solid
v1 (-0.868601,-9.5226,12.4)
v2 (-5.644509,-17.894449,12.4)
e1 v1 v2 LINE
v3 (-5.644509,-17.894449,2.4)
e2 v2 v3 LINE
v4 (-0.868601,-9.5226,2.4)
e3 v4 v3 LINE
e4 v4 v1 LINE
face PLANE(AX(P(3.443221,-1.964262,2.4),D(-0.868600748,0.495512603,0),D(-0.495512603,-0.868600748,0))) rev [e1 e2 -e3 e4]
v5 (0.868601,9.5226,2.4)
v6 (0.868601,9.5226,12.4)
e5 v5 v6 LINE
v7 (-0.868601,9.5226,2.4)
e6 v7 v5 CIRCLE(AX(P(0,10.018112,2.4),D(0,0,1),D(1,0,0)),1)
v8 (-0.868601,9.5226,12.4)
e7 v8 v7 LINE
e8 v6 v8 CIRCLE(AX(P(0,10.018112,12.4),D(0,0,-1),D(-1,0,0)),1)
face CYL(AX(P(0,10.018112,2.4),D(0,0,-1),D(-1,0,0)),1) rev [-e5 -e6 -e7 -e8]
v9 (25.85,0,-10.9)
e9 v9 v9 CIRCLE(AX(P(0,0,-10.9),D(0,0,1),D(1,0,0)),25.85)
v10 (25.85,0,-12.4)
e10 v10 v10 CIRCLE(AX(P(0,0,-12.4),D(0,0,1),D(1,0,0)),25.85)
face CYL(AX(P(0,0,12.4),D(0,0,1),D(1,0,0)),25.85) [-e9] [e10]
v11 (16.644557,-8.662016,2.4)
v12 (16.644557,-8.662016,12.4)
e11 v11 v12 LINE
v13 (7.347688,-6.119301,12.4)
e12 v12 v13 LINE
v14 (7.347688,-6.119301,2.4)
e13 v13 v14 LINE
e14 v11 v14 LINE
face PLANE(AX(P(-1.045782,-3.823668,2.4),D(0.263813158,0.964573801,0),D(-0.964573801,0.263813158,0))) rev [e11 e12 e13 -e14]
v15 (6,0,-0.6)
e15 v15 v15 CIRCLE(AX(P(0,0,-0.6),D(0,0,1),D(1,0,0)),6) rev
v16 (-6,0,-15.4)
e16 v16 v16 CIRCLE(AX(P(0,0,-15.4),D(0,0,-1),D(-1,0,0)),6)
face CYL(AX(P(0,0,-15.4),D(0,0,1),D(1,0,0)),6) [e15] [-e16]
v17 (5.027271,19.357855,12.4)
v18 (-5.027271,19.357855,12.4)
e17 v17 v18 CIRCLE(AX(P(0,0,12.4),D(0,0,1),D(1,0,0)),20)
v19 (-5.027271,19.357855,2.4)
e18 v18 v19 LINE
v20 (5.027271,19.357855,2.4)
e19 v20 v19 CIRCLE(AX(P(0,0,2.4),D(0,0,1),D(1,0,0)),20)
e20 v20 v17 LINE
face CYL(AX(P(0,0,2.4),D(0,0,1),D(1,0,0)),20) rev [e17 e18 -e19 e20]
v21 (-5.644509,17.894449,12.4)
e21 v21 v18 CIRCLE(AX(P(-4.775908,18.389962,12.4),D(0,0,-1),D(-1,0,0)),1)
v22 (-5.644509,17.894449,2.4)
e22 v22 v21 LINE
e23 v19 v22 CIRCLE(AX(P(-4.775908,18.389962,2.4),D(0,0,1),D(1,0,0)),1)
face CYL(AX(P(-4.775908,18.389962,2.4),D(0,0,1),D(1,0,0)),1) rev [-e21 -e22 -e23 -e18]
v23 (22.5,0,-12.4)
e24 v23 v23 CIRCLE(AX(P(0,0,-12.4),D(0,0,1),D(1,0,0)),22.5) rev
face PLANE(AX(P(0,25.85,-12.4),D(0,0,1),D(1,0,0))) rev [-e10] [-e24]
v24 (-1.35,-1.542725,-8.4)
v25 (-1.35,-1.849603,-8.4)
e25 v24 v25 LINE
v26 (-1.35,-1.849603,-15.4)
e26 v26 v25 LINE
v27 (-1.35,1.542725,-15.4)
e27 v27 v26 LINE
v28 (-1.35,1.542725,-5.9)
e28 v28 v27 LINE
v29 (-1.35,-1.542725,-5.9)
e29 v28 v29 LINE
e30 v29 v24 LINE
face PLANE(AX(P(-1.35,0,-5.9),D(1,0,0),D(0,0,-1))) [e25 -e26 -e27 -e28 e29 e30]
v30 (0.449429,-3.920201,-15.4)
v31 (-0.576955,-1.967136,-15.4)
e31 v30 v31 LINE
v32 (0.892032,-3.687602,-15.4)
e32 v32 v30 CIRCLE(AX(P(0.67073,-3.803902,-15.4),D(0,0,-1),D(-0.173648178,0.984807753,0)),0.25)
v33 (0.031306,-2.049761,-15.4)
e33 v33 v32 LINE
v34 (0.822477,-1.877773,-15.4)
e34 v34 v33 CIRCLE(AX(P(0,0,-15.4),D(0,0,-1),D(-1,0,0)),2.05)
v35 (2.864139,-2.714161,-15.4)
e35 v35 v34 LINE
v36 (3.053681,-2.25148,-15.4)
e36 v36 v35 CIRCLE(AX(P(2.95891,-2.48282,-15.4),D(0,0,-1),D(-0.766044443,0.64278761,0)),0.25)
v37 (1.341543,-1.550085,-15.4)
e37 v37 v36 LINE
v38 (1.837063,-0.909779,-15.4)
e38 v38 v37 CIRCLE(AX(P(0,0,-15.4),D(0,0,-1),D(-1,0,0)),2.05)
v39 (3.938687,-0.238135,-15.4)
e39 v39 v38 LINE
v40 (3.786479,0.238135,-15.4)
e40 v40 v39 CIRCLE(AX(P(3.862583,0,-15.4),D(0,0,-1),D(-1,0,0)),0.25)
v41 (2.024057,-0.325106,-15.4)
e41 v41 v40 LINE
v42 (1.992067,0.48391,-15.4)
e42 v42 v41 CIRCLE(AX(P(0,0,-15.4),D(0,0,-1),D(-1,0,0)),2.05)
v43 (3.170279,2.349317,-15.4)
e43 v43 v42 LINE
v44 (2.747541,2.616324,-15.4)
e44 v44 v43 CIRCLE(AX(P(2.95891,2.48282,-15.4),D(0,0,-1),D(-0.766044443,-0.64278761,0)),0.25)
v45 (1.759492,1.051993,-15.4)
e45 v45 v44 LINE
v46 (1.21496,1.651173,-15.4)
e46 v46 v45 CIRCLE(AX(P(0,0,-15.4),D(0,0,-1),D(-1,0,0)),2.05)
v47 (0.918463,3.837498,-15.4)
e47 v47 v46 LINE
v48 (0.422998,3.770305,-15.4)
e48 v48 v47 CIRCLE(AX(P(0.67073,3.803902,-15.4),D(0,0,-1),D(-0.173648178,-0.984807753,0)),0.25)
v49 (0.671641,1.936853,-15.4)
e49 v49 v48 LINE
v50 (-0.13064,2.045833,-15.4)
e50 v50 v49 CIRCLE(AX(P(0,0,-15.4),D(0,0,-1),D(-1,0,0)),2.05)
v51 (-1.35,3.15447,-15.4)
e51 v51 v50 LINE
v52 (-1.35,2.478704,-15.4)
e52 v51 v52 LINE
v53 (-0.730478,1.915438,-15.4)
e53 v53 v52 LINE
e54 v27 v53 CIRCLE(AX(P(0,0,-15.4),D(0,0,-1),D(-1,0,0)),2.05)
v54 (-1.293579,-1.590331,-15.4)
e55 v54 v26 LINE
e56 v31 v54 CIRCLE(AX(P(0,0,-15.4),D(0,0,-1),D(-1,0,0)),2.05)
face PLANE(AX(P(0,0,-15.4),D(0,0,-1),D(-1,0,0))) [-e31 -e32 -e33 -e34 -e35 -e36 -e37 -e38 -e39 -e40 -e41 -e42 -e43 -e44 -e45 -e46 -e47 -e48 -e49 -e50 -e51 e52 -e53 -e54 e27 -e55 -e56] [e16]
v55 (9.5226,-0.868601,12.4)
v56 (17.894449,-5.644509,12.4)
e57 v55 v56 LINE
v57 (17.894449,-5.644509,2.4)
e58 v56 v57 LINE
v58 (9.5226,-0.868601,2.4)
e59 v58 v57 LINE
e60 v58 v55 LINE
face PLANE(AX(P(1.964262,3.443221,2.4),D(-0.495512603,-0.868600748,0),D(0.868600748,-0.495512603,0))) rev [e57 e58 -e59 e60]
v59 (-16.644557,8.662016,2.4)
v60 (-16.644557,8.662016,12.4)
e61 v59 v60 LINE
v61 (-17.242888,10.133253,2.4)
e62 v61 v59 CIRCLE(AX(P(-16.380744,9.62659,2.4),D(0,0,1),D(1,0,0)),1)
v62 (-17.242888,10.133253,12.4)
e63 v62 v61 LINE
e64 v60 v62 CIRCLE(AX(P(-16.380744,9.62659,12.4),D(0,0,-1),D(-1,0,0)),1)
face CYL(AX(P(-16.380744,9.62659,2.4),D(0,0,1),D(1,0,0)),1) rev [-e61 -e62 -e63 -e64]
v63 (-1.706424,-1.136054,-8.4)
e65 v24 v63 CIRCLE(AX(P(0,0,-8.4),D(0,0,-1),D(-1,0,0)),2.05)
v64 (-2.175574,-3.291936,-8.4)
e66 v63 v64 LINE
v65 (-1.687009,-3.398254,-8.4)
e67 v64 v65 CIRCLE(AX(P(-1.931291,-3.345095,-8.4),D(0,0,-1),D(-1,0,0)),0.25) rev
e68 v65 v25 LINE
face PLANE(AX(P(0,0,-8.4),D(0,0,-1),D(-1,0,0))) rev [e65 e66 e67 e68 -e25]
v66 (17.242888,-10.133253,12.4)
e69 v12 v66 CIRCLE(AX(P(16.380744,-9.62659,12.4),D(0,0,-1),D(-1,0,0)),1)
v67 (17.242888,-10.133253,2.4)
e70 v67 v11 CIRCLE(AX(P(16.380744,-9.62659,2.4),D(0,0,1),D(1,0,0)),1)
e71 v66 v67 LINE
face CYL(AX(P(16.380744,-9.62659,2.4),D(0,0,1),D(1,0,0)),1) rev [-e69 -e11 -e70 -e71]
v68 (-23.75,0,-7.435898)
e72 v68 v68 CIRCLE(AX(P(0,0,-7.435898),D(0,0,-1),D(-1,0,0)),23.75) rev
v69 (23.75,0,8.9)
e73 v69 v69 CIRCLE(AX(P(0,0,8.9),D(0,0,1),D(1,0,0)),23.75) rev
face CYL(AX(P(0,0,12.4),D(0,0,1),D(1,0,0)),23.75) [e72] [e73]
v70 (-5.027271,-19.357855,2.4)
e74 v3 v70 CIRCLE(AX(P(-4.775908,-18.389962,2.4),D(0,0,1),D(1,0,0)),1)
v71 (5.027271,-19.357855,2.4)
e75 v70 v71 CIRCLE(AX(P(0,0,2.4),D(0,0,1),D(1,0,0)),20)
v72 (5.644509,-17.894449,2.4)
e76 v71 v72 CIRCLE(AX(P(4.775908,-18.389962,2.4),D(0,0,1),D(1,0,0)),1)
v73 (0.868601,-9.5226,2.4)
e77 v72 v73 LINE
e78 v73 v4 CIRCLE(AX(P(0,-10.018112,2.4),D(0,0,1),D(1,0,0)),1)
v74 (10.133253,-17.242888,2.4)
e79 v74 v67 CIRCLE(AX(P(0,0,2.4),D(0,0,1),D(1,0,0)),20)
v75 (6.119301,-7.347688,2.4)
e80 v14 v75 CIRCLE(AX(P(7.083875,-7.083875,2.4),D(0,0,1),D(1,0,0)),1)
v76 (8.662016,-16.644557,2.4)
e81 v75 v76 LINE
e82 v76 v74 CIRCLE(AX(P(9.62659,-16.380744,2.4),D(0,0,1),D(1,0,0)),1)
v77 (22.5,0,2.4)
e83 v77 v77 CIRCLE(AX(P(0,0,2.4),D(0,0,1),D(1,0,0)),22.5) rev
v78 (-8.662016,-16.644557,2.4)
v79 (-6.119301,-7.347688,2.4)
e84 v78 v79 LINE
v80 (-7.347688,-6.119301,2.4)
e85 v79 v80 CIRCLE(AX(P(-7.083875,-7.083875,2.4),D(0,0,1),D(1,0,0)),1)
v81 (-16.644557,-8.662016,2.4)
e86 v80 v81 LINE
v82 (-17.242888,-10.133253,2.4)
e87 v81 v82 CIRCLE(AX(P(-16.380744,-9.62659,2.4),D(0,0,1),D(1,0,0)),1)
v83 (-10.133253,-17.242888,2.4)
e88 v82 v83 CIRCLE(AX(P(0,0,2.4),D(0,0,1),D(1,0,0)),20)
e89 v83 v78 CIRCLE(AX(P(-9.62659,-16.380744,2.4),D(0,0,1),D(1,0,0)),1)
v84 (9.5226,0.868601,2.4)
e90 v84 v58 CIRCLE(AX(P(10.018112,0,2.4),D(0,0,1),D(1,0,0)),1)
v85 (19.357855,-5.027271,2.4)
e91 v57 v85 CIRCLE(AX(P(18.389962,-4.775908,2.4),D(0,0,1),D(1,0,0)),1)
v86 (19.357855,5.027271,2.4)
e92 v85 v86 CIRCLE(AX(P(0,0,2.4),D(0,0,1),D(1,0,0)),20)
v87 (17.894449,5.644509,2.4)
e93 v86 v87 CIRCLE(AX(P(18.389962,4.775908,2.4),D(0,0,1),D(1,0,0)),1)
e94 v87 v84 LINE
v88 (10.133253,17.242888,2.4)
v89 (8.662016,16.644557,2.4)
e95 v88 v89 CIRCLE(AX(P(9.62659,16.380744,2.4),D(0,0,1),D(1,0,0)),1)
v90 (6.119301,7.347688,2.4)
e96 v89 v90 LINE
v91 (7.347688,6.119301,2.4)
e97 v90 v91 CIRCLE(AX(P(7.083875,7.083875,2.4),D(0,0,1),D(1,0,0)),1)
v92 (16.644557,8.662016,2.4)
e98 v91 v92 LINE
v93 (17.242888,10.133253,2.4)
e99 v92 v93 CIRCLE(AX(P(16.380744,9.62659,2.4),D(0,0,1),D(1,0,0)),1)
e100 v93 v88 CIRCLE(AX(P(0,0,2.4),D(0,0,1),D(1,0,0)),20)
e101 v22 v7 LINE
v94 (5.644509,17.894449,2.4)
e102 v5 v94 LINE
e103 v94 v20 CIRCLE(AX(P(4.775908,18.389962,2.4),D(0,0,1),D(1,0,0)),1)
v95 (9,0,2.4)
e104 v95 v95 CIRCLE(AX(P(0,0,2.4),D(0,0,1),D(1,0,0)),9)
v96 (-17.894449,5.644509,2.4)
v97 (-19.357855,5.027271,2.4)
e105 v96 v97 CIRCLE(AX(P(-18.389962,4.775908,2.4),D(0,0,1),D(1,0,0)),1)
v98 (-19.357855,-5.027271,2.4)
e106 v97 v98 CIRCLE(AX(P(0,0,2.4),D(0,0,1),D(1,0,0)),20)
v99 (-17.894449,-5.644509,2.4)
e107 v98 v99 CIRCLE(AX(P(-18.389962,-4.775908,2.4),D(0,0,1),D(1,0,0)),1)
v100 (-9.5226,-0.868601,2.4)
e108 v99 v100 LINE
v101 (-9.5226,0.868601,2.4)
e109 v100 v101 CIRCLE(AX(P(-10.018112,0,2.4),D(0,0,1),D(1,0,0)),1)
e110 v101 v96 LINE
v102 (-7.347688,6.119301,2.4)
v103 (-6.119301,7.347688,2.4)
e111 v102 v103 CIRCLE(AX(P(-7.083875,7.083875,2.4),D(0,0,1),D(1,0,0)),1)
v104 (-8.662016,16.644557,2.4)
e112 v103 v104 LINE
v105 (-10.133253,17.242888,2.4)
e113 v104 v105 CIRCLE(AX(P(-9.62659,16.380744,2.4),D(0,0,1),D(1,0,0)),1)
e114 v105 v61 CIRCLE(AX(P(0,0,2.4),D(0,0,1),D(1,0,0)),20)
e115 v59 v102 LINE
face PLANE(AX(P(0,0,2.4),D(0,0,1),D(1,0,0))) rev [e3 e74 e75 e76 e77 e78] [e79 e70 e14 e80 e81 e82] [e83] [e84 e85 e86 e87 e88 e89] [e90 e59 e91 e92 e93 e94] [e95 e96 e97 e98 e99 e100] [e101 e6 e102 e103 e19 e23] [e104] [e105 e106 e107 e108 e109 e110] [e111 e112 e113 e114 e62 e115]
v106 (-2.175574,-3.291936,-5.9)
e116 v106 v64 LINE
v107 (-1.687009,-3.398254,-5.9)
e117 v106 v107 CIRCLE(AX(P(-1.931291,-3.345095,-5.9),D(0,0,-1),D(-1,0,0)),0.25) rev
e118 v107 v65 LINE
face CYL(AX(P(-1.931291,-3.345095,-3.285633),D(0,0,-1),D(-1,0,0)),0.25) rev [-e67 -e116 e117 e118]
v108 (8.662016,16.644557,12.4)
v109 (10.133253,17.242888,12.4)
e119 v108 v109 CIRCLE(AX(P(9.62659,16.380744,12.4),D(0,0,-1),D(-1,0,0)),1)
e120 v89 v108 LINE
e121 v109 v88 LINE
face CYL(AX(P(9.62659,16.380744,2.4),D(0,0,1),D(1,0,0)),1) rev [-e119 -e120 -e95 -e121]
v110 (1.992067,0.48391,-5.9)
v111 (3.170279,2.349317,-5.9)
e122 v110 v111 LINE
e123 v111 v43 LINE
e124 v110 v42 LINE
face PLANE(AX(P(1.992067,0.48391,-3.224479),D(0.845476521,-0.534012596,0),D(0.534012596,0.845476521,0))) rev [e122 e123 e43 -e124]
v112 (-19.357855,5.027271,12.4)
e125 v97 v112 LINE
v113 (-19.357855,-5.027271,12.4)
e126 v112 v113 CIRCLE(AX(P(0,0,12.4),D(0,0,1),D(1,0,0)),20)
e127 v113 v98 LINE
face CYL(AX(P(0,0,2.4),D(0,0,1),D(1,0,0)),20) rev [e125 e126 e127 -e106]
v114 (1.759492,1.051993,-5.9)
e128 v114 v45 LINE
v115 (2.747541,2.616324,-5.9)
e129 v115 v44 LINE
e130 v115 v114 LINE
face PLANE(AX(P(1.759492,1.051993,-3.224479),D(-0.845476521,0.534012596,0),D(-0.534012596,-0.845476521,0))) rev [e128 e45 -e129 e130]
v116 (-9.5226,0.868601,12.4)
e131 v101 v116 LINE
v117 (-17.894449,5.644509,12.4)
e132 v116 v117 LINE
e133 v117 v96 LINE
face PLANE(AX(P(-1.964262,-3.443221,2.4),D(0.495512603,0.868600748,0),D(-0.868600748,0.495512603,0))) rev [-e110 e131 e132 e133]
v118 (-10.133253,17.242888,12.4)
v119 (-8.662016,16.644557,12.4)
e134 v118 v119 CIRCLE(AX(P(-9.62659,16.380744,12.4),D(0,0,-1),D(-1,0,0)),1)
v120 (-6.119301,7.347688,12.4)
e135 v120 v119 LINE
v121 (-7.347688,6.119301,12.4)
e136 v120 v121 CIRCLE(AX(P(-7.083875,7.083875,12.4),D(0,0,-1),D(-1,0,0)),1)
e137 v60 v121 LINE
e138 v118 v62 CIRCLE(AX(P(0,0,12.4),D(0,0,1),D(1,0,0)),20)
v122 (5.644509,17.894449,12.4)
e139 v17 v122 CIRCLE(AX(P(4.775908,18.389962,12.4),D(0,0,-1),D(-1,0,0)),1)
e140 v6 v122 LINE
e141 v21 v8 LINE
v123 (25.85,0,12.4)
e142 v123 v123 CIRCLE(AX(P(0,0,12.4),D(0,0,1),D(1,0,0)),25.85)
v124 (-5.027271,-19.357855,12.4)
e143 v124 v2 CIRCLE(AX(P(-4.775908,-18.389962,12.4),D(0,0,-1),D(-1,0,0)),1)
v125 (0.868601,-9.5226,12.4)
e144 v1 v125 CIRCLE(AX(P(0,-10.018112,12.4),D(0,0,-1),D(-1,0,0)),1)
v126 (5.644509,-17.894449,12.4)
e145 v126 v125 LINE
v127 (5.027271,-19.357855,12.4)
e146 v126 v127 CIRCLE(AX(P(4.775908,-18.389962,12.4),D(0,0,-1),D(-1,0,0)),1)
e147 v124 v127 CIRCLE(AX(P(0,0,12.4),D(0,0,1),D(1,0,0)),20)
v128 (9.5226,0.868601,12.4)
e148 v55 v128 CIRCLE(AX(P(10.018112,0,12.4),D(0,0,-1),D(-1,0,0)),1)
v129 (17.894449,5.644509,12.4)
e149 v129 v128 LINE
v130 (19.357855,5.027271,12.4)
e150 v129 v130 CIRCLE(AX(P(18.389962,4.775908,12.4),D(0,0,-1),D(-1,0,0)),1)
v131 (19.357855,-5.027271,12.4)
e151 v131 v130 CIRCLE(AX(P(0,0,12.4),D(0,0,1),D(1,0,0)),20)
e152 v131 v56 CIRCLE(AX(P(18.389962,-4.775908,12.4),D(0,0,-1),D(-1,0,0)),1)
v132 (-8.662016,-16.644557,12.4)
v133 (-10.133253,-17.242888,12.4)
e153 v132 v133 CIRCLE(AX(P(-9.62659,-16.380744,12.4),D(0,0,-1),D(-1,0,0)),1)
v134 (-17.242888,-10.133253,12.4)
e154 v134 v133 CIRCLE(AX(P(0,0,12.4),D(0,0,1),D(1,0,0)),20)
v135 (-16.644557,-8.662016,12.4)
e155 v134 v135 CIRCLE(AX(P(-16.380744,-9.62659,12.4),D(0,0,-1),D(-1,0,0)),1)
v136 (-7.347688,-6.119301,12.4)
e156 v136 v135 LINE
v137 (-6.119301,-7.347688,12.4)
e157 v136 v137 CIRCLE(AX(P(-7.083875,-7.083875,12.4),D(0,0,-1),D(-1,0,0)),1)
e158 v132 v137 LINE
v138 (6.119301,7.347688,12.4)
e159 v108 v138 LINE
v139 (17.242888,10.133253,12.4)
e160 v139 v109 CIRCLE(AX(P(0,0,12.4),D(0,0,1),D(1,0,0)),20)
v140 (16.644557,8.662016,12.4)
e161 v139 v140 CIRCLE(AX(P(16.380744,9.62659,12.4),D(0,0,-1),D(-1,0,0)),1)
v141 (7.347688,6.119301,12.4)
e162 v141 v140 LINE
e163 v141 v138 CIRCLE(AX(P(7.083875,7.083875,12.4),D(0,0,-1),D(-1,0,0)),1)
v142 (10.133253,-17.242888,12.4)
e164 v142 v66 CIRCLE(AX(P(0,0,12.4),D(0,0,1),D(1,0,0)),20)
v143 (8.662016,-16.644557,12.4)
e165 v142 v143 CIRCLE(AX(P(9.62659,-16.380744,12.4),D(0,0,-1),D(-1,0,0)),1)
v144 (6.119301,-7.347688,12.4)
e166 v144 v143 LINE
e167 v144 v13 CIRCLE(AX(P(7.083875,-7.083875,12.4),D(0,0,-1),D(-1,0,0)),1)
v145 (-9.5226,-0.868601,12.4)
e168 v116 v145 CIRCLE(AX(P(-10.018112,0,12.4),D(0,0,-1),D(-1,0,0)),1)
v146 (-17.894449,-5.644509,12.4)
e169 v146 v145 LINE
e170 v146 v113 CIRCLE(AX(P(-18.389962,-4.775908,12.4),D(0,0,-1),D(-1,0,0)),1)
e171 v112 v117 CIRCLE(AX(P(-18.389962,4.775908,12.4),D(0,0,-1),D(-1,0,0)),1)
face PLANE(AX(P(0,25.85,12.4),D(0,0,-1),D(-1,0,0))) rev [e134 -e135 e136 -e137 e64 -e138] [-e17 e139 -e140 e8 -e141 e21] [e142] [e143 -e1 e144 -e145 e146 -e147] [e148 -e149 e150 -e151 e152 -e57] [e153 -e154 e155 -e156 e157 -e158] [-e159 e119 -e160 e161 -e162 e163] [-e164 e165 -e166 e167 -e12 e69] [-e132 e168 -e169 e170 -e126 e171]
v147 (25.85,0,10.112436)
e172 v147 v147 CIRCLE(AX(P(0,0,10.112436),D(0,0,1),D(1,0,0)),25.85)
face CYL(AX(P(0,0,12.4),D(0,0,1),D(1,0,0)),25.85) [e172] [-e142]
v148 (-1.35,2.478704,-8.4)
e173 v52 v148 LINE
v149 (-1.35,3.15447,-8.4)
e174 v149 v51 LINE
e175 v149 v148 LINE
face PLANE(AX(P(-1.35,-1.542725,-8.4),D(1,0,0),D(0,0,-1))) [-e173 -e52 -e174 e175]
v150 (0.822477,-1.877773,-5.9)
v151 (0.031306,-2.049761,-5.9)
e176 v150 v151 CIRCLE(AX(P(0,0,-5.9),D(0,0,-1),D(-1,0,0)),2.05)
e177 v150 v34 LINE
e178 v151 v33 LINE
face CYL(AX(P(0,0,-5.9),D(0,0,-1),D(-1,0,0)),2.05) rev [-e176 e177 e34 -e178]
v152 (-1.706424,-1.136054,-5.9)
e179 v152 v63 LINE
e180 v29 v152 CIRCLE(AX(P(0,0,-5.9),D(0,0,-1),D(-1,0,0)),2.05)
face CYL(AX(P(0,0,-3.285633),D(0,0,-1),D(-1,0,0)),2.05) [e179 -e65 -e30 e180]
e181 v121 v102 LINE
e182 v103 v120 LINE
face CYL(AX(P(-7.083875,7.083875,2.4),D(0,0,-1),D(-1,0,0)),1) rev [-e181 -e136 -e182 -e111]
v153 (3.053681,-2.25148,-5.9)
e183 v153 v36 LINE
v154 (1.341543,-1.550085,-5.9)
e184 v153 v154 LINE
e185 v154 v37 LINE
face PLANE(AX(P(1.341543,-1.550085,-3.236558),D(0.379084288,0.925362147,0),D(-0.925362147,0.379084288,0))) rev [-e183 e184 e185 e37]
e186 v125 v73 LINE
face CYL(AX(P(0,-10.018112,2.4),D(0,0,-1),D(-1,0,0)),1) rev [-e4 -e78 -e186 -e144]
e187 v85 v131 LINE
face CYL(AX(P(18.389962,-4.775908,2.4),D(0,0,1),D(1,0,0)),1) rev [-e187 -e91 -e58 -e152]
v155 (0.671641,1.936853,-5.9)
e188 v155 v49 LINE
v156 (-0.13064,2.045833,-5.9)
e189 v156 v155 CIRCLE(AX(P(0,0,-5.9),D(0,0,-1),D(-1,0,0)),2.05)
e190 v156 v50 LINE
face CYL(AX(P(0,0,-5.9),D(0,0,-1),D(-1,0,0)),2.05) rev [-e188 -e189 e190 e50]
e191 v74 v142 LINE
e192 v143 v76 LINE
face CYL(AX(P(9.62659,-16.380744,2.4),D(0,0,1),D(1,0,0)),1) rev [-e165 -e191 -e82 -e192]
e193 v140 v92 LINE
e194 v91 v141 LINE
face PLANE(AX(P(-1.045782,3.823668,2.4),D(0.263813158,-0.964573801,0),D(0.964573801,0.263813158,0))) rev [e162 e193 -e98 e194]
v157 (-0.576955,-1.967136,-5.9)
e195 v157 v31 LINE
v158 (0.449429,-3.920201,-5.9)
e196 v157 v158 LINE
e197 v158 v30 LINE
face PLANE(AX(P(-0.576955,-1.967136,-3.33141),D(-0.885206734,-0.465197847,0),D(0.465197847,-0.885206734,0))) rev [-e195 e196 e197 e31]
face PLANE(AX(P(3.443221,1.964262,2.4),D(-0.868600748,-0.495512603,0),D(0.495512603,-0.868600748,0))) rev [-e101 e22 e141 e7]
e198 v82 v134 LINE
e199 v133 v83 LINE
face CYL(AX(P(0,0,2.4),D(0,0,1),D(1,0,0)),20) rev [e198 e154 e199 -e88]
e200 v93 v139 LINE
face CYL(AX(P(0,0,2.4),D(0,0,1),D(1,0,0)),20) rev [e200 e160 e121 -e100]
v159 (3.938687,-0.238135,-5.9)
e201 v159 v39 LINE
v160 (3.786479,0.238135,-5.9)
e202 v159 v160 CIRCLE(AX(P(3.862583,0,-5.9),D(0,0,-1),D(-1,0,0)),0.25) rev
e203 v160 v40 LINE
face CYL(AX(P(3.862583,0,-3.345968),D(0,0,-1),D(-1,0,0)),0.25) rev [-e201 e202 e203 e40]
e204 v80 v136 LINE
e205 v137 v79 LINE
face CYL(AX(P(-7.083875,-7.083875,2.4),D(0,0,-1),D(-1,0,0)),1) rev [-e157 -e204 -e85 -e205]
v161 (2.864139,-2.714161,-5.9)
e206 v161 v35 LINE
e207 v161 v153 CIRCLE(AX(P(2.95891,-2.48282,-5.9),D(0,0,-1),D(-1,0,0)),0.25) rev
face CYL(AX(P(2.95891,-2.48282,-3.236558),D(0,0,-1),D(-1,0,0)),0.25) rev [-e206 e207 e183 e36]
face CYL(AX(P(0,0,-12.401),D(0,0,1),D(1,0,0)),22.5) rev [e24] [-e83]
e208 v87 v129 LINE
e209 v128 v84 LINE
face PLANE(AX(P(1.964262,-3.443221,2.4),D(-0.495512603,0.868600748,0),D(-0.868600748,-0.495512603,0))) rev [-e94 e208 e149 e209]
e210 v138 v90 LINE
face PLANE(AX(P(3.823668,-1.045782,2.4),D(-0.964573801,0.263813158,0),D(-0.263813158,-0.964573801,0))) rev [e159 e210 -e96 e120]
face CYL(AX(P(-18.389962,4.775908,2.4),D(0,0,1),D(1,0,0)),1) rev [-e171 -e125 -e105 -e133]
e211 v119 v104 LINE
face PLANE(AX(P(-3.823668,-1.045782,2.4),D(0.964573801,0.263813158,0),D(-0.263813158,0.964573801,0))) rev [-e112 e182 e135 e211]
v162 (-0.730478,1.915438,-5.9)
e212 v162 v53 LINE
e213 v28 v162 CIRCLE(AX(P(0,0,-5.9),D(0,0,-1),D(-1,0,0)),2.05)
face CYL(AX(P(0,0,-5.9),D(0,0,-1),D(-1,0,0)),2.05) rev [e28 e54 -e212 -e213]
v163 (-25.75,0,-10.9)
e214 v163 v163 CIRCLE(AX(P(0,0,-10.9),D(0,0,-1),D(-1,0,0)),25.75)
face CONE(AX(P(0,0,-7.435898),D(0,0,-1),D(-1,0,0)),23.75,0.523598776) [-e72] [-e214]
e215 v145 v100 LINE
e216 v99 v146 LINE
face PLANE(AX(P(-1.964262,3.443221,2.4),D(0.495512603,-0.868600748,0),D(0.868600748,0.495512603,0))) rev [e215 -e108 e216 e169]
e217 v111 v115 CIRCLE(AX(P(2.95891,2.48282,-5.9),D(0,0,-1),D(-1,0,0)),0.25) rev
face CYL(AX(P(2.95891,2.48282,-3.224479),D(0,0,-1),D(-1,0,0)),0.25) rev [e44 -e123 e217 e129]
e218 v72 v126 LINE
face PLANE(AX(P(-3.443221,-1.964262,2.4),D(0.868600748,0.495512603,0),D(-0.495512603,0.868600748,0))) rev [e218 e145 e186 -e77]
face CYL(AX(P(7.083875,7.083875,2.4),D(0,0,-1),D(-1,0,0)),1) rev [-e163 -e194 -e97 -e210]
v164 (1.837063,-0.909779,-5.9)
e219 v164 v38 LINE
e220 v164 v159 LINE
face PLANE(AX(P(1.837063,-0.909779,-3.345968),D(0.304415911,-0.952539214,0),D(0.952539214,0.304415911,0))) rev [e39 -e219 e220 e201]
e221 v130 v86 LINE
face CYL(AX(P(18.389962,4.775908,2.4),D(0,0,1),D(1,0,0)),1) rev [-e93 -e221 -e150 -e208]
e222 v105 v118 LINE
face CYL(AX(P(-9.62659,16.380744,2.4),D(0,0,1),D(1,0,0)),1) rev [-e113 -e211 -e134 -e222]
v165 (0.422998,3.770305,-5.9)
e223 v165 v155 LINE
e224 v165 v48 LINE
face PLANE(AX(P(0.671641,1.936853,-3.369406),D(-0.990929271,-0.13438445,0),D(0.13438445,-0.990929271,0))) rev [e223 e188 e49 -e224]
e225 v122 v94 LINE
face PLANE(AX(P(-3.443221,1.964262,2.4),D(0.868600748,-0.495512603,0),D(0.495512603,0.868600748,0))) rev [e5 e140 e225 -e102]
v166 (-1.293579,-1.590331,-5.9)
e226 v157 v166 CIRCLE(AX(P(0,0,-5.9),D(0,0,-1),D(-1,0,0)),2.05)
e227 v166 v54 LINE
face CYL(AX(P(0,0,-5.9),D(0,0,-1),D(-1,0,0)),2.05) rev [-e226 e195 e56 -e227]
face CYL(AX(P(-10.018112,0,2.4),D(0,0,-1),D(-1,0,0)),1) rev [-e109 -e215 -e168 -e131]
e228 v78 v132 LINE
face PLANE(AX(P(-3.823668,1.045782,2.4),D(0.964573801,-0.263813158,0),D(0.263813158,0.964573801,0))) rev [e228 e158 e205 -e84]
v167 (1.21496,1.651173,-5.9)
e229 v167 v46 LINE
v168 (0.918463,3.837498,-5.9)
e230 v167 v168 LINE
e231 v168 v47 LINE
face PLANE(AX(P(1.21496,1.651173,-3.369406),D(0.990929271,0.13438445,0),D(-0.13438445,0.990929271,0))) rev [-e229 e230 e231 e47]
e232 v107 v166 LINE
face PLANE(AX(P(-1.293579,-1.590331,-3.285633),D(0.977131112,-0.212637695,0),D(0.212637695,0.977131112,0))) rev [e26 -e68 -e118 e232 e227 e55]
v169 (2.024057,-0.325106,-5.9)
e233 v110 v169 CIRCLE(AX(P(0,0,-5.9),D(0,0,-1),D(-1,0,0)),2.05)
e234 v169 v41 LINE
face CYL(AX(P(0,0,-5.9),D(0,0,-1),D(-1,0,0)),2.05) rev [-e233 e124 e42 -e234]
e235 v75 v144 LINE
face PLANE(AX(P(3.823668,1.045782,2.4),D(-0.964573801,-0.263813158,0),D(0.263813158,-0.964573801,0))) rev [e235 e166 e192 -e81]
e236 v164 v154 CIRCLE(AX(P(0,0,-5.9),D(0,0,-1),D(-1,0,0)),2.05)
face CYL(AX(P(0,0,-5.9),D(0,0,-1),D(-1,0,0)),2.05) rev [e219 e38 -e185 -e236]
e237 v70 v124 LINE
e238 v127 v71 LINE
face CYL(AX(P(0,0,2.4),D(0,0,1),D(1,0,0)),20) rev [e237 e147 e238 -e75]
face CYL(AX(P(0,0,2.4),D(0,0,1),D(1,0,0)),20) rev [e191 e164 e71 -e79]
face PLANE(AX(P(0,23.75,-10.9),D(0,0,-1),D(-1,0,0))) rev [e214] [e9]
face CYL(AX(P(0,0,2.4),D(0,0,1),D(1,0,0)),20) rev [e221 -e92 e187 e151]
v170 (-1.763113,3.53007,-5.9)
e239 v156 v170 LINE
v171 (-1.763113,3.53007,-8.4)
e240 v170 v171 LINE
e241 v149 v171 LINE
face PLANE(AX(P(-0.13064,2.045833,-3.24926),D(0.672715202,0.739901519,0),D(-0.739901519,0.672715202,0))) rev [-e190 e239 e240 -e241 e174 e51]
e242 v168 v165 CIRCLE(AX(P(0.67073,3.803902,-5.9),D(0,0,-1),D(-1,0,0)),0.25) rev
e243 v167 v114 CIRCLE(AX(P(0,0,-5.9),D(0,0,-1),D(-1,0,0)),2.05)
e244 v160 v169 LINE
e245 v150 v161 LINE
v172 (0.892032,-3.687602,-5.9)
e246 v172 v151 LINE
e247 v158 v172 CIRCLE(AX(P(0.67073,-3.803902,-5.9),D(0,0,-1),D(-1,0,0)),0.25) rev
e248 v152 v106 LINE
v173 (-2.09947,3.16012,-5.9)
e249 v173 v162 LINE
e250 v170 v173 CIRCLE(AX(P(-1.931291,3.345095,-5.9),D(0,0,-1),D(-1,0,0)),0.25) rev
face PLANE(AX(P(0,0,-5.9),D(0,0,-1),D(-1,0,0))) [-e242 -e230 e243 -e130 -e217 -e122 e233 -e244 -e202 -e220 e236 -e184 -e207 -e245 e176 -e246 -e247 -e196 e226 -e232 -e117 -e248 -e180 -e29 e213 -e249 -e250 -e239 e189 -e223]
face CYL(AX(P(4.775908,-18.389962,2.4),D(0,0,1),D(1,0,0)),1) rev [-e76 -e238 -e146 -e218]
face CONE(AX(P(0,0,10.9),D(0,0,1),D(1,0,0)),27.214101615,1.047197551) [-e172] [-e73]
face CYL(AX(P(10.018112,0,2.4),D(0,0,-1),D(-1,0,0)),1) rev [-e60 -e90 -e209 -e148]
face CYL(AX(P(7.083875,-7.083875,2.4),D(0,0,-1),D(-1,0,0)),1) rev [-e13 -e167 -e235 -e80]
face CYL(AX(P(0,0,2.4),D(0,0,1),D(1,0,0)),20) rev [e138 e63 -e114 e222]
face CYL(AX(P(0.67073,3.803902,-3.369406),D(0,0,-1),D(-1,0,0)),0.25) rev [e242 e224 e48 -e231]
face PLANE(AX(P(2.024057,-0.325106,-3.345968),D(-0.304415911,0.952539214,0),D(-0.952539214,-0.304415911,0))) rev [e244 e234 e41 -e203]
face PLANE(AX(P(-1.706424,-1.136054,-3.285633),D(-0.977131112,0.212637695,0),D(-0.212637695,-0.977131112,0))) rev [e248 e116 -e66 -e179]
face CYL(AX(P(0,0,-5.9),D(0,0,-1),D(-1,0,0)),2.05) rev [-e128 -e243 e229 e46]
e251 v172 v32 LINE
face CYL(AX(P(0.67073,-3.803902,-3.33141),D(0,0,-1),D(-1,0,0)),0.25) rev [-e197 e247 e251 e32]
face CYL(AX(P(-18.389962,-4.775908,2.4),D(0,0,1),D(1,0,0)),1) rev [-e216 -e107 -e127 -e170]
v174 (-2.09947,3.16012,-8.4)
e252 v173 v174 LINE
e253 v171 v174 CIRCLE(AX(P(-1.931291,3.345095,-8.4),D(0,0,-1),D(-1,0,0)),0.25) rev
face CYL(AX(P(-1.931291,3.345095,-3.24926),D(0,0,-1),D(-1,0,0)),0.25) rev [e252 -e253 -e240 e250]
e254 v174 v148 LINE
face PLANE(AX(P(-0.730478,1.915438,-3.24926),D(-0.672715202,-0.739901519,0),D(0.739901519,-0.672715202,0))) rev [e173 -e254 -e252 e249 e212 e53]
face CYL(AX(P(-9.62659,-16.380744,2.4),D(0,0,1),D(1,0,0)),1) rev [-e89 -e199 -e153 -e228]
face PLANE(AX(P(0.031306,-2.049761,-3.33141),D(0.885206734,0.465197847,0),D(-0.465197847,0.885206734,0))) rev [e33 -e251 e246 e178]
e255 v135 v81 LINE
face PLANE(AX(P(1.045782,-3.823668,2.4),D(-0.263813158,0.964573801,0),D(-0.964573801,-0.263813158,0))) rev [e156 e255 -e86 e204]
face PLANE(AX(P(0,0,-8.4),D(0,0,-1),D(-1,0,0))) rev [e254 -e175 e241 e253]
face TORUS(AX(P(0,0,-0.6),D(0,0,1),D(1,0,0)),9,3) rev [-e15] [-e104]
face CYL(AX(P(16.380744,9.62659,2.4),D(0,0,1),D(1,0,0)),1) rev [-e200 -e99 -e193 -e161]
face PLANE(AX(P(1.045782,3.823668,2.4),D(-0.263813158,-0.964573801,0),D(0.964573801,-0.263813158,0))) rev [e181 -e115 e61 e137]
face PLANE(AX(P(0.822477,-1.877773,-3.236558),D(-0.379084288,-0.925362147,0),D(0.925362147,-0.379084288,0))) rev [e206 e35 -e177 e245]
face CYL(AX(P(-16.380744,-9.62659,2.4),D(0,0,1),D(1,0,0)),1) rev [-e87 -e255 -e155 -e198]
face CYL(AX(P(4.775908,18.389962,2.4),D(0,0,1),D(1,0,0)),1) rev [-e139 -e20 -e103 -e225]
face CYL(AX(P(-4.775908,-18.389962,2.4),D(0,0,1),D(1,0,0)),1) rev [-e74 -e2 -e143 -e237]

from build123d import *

# Parameters (mm, degrees)
CORTAR_EXTRUIR1_REACH        = 46.176
CROQUIS3_R                   = 22.5
CROQUIS4_R                   = 22.5
CROQUIS4_R_2                 = 20
SALIENTE_EXTRUIR1_DEPTH      = 10
REDONDEO2_R                  = 1
CROQUIS6_R                   = 6
SALIENTE_EXTRUIR2_DEPTH      = 17.8
CORTAR_EXTRUIR3_DEPTH        = 9.5
CORTAR_EXTRUIR4_DEPTH        = 9.5
MATRIZC1_COUNT               = 4
MATRIZC1_ANGLE               = 120
MATRIZC1_THE_OTHER_WAY_COUNT = 4
MATRIZC1_THE_OTHER_WAY_ANGLE = 120
REDONDEO3_R                  = 3
SALIENTE_EXTRUIR3_START      = -7
SALIENTE_EXTRUIR3_DEPTH      = 7
CHAFL_N1_SIZE                = 3.464101615
CHAFL_N1_SIZE_2              = 2


with BuildPart() as part:
    # Croquis2 → Revolución2 (revolve)
    with BuildSketch(Plane(origin=(0, 0, 0), x_dir=(0, 0, -1), z_dir=(1, 0, 0)), mode=Mode.PRIVATE) as revoluci_n2_sk:
        Polygon((-10.9, 23.75), (10.9, 23.75), (10.9, 25.85), (12.4, 25.85), (12.4, 0), (-12.4, 0), (-12.4, 25.85), (-10.9, 25.85), align=None)
    revolve(revoluci_n2_sk.sketch.rotate(Axis((0, 0, 12.4), (0, 0, -1)), 90), axis=Axis((0, 0, 12.4), (0, 0, -1)))

    # Croquis3 → Cortar-Extruir1 (cut, up to next)
    with BuildSketch(Plane.XY.offset(12.4), mode=Mode.PRIVATE) as cortar_extruir1_sk1:
        Circle(CROQUIS3_R)
    cortar_extruir1_tool1 = extrude(cortar_extruir1_sk1.sketch, amount=-CORTAR_EXTRUIR1_REACH, mode=Mode.PRIVATE) & part.part
    add(cortar_extruir1_tool1.solids().sort_by_distance((0, 0, 12.4))[0], mode=Mode.SUBTRACT)

    # Croquis4 → Saliente-Extruir1 (add)
    # profile 1 of 2: a face of its own
    with BuildSketch(Plane.XY.offset(12.4)):
        Circle(CROQUIS4_R)
        Circle(CROQUIS4_R_2, mode=Mode.SUBTRACT)
    # profile 2 of 2: a face of its own
    with BuildSketch(Plane.XY.offset(12.4)):
        with BuildLine():
            Line((0, 8), (-6.270417461, 18.991626177))
            ThreePointArc((-6.270417461, 18.991626177), (-7.653668647, 18.47759065), (-8.995252948, 17.862962364))
            Line((-8.995252948, 17.862962364), (-5.656854249, 5.656854249))
            Line((-5.656854249, 5.656854249), (-17.862962364, 8.995252948))
            ThreePointArc((-17.862962364, 8.995252948), (-18.47759065, 7.653668647), (-18.991626177, 6.270417461))
            Line((-18.991626177, 6.270417461), (-8, 0))
            Line((-8, 0), (-18.991626177, -6.270417461))
            ThreePointArc((-18.991626177, -6.270417461), (-18.47759065, -7.653668647), (-17.862962364, -8.995252948))
            Line((-17.862962364, -8.995252948), (-5.656854249, -5.656854249))
            Line((-5.656854249, -5.656854249), (-8.995252948, -17.862962364))
            ThreePointArc((-8.995252948, -17.862962364), (-7.653668647, -18.47759065), (-6.270417461, -18.991626177))
            Line((-6.270417461, -18.991626177), (0, -8))
            Line((0, -8), (6.270417461, -18.991626177))
            ThreePointArc((6.270417461, -18.991626177), (7.653668647, -18.47759065), (8.995252948, -17.862962364))
            Line((8.995252948, -17.862962364), (5.656854249, -5.656854249))
            Line((5.656854249, -5.656854249), (17.862962364, -8.995252948))
            ThreePointArc((17.862962364, -8.995252948), (18.47759065, -7.653668647), (18.991626177, -6.270417461))
            Line((18.991626177, -6.270417461), (8, 0))
            Line((8, 0), (18.991626177, 6.270417461))
            ThreePointArc((18.991626177, 6.270417461), (18.47759065, 7.653668647), (17.862962364, 8.995252948))
            Line((17.862962364, 8.995252948), (5.656854249, 5.656854249))
            Line((5.656854249, 5.656854249), (8.995252948, 17.862962364))
            ThreePointArc((8.995252948, 17.862962364), (7.653668647, 18.47759065), (6.270417461, 18.991626177))
            Line((6.270417461, 18.991626177), (0, 8))
        make_face()
    extrude(amount=-SALIENTE_EXTRUIR1_DEPTH)

    # Redondeo2
    redondeo2_edges = [part.edges().sort_by_distance(p)[0] for p in [
        (18.991626177, -6.270417461, 7.4),
        (18.991626177, 6.270417461, 7.4),
        (8.995252948, -17.862962364, 7.4),
        (17.862962364, -8.995252948, 7.4),
        (-6.270417461, -18.991626177, 7.4),
        (6.270417461, -18.991626177, 7.4),
        (-17.862962364, -8.995252948, 7.4),
        (-8.995252948, -17.862962364, 7.4),
        (-18.991626177, 6.270417461, 7.4),
        (-18.991626177, -6.270417461, 7.4),
        (-8.995252948, 17.862962364, 7.4),
        (-17.862962364, 8.995252948, 7.4),
        (6.270417461, 18.991626177, 7.4),
        (-6.270417461, 18.991626177, 7.4),
        (17.862962364, 8.995252948, 7.4),
        (8.995252948, 17.862962364, 7.4),
        (8, 0, 7.4),
        (5.656854249, -5.656854249, 7.4),
        (0, -8, 7.4),
        (-5.656854249, -5.656854249, 7.4),
        (-8, 0, 7.4),
        (-5.656854249, 5.656854249, 7.4),
        (0, 8, 7.4),
        (5.656854249, 5.656854249, 7.4),
    ]]
    fillet(redondeo2_edges, radius=REDONDEO2_R)

    # Croquis6 → Saliente-Extruir2 (add)
    with BuildSketch(Plane(origin=(0, 0, 2.4), x_dir=(-1, 0, 0), z_dir=(0, 0, -1))):
        with Locations(Location((0, 0, 0), (0, 0, 180))):
            Circle(CROQUIS6_R)
    extrude(amount=SALIENTE_EXTRUIR2_DEPTH)

    # Croquis7 → Cortar-Extruir3 (cut)
    with BuildSketch(Plane(origin=(0, 0, -15.4), x_dir=(-1, 0, 0), z_dir=(0, 0, -1))):
        with BuildLine():
            Line((1.35, -1.542724862), (1.35, 1.542724862))
            ThreePointArc((1.35, 1.542724862), (-2.05, 0), (1.35, -1.542724862))
        make_face()
    extrude(amount=-CORTAR_EXTRUIR3_DEPTH, mode=Mode.SUBTRACT)

    # Croquis8 → Cortar-Extruir4 (cut)
    with BuildSketch(Plane(origin=(0, 0, -15.4), x_dir=(-1, 0, 0), z_dir=(0, 0, -1))):
        with BuildLine():
            Line((-1.837063356, -0.909779217), (-3.938686891, -0.238134803))
            ThreePointArc((-3.938686891, -0.238134803), (-4.100717717, 0.076103978), (-3.786478936, 0.238134803))
            Line((-3.786478936, 0.238134803), (-2.024056773, -0.325106415))
            ThreePointArc((-2.024056773, -0.325106415), (-1.995828785, -0.468153243), (-1.957504486, -0.608831821))
            ThreePointArc((-1.957504486, -0.608831821), (-1.903241606, -0.761689824), (-1.837063356, -0.909779217))
        make_face()
    cortar_extruir4 = extrude(amount=-CORTAR_EXTRUIR4_DEPTH, mode=Mode.SUBTRACT)

    # MatrizC1: Cortar-Extruir4 ×4 about axis
    matrizc1_axis = Axis((0, 0, 0), (0, 0, -1))
    for i in range(1, MATRIZC1_COUNT):
        add(cortar_extruir4.rotate(matrizc1_axis, i * MATRIZC1_ANGLE / (MATRIZC1_COUNT - 1)), mode=Mode.SUBTRACT)

    # MatrizC1 the other way: Cortar-Extruir4 ×4 about axis
    matrizc1_the_other_way_axis = Axis((0, 0, 0), (0, 0, 1))
    for i in range(1, MATRIZC1_THE_OTHER_WAY_COUNT):
        add(cortar_extruir4.rotate(matrizc1_the_other_way_axis, i * MATRIZC1_THE_OTHER_WAY_ANGLE / (MATRIZC1_THE_OTHER_WAY_COUNT - 1)), mode=Mode.SUBTRACT)

    # Redondeo3
    redondeo3_edges = [part.edges().sort_by_distance(p)[0] for p in [
        (-6, 0, 2.4),
    ]]
    fillet(redondeo3_edges, radius=REDONDEO3_R)

    # Croquis9 → Saliente-Extruir3 (add)
    with BuildSketch(Plane(origin=(0, 0, -15.4), x_dir=(-1, 0, 0), z_dir=(0, 0, -1)).offset(SALIENTE_EXTRUIR3_START)):
        with BuildLine():
            Line((1.35, 1.542724862), (1.35, -1.542724862))
            Line((1.35, -1.542724862), (1.35, -5.846152581))
            ThreePointArc((1.35, -5.846152581), (6, 0), (1.35, 5.846152581))
            Line((1.35, 5.846152581), (1.35, 1.542724862))
        make_face()
    extrude(amount=SALIENTE_EXTRUIR3_DEPTH)

    # Chaflán1
    # the kernel refuses this chamfer: 3.464101615, 2 mm, written as the material it adds along each edge
    with BuildSketch(Plane(origin=(0, 0, -10.9), x_dir=(1, 0, 0), z_dir=(0, 1, 0))) as chafl_n1_piece_1:
        Polygon((23.75, -CHAFL_N1_SIZE), (23.75 + CHAFL_N1_SIZE_2, 0), (23.75, 0), align=None)
    revolve(axis=Axis((0, 0, -10.9), (0, 0, -1)))
    with BuildSketch(Plane(origin=(0, 0, 10.9), x_dir=(1, 0, 0), z_dir=(0, 1, 0))) as chafl_n1_piece_2_section:
        Polygon((23.75 + CHAFL_N1_SIZE, 0), (23.75, CHAFL_N1_SIZE_2), (23.75, 0), align=None)
    chafl_n1_piece_2 = revolve(axis=Axis((0, 0, 10.9), (0, 0, -1)), mode=Mode.PRIVATE)
    chafl_n1_piece_2 = chafl_n1_piece_2 & Plane(origin=(0, 0, 9.540393741), x_dir=(1, 0, 0), z_dir=(0, 0, -1)) * Cylinder(25.85, 109, mode=Mode.PRIVATE)
    add(chafl_n1_piece_2)


solid = part.part
